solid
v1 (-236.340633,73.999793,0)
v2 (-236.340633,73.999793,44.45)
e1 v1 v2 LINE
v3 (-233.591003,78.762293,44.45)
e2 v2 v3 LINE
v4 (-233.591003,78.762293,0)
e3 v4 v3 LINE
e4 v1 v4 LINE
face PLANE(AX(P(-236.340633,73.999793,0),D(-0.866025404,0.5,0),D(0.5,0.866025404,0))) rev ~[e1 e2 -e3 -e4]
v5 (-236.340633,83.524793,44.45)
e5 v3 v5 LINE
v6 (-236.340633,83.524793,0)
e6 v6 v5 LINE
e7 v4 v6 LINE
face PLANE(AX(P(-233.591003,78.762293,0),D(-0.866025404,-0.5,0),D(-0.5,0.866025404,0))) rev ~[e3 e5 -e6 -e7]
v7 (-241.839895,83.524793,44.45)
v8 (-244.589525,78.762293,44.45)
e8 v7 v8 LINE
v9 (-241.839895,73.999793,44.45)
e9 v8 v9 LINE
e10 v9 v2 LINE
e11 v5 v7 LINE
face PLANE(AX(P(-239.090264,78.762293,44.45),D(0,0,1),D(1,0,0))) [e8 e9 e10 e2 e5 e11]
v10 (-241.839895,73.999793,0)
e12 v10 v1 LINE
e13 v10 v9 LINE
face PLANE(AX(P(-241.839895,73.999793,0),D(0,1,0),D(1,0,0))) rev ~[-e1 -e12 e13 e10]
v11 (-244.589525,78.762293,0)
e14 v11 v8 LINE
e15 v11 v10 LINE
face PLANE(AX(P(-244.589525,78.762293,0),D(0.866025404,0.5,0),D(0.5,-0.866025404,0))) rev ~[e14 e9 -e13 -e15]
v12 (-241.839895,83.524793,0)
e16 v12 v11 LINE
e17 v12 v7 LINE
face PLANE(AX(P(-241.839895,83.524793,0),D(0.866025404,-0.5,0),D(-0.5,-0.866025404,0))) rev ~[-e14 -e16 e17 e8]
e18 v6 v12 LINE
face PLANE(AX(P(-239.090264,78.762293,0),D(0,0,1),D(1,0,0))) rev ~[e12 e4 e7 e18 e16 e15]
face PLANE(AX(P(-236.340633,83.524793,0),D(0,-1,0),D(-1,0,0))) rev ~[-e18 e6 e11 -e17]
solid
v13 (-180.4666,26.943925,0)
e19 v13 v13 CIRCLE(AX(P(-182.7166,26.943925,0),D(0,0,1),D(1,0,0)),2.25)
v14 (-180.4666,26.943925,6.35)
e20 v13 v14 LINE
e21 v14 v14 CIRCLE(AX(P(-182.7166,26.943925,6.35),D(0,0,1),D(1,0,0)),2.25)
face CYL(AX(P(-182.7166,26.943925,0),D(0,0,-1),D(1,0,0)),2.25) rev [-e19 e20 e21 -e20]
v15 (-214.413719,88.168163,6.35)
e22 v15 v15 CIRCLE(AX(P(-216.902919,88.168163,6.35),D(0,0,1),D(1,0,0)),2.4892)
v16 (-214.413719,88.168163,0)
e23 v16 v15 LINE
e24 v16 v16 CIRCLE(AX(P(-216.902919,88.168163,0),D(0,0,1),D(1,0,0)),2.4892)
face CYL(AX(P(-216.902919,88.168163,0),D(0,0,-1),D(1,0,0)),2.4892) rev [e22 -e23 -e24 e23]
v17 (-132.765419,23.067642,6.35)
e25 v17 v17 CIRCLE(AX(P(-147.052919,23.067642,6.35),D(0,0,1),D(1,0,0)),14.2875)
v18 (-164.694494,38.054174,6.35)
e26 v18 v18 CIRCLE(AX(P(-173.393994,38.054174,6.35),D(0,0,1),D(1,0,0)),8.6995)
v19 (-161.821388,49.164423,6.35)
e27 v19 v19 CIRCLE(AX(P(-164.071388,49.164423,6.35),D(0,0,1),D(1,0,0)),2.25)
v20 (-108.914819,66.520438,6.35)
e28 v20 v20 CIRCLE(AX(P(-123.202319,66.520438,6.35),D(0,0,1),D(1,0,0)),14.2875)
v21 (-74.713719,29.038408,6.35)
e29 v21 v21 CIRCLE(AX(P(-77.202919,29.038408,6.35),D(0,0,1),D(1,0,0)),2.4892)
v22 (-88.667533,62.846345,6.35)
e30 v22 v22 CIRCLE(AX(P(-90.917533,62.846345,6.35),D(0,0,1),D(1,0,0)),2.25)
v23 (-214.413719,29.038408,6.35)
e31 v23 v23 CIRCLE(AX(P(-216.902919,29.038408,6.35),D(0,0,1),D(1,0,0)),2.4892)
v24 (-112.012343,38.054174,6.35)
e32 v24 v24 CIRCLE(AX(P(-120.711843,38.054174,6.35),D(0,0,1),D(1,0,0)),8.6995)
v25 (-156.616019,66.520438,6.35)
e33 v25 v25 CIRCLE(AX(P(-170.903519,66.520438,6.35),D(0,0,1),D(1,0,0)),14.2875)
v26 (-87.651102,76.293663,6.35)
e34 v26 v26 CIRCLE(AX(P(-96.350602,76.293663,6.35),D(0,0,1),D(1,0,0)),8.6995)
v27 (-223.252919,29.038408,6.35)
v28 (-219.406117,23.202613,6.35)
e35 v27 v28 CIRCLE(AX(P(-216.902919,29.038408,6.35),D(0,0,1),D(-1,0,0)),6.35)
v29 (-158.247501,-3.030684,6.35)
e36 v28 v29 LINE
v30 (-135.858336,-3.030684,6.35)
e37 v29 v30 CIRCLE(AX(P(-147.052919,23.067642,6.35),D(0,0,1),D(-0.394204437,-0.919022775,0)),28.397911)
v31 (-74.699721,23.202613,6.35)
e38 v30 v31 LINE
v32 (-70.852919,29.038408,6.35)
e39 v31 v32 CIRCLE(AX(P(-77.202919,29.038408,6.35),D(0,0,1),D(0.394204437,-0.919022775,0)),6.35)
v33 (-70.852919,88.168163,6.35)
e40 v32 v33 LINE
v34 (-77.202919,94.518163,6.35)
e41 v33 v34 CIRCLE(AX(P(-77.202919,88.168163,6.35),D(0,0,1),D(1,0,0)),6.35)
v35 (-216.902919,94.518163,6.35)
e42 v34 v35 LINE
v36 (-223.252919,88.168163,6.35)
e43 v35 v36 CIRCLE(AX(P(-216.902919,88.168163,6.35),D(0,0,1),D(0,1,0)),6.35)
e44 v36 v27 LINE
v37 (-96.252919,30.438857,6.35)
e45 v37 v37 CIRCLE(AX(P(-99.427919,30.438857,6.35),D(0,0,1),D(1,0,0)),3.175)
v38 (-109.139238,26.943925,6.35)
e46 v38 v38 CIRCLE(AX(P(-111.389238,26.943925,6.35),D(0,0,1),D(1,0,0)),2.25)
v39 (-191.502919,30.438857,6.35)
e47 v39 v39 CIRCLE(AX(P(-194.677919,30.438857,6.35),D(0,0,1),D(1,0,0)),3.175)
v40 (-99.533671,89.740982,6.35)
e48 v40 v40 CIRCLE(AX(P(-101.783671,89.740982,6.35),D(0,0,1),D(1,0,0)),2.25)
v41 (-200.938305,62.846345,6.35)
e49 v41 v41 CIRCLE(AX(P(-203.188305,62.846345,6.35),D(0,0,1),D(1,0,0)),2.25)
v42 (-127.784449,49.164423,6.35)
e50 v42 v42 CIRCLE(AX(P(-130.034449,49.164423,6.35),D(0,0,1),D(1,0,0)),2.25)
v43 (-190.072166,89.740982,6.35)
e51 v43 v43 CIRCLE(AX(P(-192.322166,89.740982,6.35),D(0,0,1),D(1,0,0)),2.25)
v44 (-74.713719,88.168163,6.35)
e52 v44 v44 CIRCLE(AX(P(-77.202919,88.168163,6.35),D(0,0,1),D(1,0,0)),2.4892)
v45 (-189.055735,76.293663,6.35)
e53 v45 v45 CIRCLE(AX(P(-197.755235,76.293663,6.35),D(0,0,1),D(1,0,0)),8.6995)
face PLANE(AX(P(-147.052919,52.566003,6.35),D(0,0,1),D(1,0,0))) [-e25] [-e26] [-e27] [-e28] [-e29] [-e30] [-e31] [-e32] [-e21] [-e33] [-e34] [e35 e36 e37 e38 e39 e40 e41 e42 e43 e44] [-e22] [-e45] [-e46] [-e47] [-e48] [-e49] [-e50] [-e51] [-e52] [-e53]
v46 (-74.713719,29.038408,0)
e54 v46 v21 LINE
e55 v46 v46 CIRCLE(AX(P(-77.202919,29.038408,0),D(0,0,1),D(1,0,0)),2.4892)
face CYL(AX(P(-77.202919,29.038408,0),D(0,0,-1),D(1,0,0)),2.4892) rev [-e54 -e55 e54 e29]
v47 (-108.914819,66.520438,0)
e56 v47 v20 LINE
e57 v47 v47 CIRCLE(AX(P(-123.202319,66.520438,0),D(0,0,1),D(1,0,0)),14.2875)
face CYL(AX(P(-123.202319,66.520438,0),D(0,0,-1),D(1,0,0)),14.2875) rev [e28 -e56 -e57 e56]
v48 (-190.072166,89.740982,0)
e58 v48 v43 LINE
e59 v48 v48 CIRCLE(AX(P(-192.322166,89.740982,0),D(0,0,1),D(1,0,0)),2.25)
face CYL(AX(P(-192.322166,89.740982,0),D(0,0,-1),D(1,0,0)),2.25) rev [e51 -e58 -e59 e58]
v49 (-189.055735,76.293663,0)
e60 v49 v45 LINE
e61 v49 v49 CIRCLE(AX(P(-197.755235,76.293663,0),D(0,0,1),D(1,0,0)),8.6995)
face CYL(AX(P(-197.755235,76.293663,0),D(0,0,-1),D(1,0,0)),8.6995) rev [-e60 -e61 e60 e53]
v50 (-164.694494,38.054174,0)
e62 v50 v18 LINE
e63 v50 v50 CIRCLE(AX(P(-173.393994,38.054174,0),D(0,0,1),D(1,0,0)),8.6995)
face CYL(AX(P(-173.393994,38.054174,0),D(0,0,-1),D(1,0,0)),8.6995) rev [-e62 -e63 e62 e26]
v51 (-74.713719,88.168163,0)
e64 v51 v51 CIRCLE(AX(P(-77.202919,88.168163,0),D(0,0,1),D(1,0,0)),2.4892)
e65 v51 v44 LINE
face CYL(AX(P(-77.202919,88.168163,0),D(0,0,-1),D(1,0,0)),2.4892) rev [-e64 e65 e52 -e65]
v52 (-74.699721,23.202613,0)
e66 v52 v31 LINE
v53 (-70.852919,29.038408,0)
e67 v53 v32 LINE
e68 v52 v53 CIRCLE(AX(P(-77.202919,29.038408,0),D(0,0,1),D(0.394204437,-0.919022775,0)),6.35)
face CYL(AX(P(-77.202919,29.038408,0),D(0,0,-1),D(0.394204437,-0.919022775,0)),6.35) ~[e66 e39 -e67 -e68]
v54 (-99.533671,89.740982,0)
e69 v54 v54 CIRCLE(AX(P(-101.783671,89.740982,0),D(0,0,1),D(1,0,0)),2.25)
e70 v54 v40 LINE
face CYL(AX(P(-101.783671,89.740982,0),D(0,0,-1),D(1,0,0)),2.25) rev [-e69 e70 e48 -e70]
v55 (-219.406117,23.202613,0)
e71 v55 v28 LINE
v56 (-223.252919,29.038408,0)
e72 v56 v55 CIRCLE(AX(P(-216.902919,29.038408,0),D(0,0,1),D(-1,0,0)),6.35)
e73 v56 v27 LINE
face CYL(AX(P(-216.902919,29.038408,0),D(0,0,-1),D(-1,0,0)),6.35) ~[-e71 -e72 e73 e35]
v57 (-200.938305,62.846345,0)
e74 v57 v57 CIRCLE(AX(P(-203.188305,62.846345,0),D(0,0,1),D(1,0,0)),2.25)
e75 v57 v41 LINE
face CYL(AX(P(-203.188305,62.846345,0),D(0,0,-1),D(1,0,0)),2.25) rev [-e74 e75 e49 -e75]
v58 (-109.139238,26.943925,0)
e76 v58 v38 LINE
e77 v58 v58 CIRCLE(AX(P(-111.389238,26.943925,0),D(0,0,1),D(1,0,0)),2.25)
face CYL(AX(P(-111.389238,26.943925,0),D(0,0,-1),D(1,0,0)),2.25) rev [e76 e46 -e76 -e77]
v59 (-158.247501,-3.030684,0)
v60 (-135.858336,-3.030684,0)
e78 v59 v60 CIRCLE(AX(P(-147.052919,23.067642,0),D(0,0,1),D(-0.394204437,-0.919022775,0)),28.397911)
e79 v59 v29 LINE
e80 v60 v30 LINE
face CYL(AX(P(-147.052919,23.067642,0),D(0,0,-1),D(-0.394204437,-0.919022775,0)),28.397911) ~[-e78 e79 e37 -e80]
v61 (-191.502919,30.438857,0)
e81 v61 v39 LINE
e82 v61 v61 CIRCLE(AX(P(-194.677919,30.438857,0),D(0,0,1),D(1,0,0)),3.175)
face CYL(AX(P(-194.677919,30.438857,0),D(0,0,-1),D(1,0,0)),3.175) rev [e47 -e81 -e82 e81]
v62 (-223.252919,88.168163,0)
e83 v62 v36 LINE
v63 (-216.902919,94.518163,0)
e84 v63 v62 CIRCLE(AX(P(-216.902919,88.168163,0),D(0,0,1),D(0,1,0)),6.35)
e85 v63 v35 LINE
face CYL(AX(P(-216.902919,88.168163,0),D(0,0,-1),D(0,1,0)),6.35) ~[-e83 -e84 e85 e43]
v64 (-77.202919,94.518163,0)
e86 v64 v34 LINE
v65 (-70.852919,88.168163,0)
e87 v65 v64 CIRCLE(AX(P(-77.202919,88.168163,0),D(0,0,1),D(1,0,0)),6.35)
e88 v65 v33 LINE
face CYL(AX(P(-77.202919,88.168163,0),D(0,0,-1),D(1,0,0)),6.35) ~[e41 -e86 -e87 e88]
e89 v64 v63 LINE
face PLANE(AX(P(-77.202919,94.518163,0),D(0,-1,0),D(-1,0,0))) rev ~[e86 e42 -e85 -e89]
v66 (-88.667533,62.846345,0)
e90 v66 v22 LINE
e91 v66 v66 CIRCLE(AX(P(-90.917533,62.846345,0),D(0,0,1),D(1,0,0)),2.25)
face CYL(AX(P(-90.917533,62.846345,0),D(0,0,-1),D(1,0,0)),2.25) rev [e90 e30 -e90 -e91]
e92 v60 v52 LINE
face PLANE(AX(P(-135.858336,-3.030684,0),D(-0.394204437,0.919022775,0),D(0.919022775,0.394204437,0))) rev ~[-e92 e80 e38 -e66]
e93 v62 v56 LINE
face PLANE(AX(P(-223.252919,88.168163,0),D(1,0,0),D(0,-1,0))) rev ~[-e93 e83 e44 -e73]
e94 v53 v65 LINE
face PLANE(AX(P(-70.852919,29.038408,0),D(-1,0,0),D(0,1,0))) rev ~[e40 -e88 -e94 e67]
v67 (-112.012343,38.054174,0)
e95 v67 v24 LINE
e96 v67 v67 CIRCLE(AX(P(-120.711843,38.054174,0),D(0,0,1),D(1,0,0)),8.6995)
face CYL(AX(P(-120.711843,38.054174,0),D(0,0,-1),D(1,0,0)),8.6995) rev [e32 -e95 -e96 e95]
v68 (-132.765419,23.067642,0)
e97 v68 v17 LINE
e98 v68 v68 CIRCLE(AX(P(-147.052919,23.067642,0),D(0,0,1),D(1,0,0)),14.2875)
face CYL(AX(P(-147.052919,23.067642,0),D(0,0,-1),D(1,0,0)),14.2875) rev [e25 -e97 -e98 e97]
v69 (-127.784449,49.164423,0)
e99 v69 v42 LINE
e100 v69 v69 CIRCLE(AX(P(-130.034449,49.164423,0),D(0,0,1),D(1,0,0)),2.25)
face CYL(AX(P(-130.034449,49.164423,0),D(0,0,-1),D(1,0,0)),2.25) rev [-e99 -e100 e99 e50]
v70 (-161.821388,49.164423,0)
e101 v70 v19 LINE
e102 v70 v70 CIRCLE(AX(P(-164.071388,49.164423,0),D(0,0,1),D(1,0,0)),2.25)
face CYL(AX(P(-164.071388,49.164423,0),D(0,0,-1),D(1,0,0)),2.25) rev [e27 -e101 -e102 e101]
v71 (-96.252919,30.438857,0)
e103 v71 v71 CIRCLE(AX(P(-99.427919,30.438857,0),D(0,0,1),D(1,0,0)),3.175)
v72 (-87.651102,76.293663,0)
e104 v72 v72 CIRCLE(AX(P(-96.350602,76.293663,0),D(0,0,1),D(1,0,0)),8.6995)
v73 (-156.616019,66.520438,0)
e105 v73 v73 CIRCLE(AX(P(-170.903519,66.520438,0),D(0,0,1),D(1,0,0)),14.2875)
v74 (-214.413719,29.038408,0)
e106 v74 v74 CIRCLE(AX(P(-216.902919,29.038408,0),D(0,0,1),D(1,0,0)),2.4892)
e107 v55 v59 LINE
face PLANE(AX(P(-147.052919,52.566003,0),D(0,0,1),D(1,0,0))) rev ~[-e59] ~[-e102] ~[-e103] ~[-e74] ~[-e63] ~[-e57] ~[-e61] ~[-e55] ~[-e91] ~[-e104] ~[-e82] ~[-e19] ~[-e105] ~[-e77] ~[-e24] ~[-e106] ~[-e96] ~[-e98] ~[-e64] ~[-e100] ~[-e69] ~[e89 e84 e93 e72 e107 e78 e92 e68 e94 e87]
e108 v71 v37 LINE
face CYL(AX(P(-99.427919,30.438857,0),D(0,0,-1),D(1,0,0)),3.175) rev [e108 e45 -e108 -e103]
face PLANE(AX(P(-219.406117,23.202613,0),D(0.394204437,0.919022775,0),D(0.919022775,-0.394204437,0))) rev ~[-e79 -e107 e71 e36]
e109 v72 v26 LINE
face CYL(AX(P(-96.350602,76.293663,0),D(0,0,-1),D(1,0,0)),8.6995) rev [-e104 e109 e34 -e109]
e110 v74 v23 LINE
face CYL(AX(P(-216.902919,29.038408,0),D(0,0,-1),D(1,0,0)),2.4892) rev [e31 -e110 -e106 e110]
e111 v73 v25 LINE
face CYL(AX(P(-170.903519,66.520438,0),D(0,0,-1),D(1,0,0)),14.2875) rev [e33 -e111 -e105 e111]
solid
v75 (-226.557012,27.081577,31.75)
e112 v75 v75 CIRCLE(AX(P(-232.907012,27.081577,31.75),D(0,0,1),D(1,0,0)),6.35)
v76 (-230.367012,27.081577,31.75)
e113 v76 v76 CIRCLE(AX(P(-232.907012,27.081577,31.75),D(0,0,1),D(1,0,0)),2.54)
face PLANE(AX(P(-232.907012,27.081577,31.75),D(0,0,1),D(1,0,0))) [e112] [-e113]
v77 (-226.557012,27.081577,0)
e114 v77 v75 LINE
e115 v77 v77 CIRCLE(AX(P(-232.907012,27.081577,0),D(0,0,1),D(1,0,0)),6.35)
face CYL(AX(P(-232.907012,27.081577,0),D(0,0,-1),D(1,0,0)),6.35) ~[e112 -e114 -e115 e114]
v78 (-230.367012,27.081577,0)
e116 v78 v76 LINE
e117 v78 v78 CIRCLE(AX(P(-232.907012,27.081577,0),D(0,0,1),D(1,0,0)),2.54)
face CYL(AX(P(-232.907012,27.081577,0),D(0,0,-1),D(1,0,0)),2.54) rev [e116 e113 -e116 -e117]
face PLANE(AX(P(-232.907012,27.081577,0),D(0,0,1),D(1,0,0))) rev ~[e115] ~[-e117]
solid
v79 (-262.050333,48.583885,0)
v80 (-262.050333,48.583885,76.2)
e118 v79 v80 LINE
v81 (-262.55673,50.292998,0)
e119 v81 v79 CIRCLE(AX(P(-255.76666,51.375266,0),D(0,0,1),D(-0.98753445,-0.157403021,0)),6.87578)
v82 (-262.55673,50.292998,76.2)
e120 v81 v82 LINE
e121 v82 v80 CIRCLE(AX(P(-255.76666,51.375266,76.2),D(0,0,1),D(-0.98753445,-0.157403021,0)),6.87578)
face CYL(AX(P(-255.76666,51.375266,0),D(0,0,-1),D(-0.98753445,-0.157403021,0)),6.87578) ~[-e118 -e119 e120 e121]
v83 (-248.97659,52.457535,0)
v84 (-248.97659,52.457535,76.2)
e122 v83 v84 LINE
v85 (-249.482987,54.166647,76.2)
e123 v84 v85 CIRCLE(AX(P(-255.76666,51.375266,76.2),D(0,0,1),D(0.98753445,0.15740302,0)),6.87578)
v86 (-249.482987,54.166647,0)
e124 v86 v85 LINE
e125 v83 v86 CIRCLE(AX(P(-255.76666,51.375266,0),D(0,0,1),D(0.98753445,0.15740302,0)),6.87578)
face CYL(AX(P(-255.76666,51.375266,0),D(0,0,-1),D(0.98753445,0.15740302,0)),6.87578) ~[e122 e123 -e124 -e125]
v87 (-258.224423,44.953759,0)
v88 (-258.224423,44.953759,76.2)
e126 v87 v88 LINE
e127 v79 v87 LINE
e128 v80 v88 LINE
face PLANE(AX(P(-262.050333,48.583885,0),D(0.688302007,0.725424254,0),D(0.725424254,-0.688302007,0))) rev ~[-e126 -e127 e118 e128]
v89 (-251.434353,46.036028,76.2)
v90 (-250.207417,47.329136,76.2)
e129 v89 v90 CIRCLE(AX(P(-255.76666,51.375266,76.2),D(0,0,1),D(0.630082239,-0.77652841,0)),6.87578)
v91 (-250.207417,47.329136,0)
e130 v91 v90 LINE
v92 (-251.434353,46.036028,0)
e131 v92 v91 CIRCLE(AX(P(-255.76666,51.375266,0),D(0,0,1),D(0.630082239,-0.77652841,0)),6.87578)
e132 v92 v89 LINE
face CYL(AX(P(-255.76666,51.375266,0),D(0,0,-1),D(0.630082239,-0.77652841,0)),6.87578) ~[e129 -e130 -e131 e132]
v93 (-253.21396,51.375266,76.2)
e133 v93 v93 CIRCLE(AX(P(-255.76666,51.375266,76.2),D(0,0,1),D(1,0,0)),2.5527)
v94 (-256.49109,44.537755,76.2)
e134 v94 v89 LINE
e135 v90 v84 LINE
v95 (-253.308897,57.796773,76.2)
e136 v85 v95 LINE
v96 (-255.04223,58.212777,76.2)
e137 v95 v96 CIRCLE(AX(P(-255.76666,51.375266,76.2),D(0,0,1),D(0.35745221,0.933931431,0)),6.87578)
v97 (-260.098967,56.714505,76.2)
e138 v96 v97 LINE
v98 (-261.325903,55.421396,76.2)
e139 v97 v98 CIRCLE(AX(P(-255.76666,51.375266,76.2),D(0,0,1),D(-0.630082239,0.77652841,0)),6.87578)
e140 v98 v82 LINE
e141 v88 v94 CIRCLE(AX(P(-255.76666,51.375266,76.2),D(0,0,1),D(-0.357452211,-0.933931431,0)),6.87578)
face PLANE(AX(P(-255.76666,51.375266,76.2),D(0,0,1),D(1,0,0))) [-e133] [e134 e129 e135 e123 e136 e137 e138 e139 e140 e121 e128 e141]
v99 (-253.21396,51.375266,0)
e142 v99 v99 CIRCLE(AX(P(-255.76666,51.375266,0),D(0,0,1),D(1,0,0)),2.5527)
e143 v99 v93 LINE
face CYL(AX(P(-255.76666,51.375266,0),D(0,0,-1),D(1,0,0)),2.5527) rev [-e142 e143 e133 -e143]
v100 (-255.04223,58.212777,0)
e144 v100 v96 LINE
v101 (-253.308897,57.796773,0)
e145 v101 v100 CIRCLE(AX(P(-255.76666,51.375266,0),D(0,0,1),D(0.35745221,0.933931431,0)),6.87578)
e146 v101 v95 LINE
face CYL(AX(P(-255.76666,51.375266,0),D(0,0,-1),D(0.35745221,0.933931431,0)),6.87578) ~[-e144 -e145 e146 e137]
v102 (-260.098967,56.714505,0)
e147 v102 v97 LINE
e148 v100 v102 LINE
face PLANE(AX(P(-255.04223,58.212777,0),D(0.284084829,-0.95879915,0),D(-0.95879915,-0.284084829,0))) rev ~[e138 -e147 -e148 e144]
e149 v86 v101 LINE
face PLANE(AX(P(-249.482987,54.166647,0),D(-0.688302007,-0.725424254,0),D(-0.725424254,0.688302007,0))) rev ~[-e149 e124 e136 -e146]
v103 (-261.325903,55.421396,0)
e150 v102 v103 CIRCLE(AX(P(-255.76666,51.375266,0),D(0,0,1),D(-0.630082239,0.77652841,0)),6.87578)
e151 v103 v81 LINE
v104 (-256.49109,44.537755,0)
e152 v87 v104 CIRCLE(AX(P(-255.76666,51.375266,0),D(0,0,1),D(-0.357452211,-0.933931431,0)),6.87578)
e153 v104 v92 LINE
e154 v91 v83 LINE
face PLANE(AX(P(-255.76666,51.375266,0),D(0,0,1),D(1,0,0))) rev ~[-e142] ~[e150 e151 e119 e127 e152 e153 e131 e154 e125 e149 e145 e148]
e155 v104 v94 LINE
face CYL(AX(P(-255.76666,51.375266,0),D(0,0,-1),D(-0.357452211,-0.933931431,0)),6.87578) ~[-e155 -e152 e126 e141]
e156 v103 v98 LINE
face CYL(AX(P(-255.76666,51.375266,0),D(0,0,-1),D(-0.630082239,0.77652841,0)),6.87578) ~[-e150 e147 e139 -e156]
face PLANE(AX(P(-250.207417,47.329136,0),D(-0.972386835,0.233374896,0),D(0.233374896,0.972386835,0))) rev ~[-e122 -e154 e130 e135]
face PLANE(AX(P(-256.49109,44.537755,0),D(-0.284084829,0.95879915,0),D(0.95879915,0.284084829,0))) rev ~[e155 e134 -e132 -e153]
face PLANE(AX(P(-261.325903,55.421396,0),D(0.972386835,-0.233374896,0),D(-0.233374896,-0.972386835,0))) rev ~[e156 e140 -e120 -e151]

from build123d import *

# Parameters (mm, degrees)
F0_R     = 2.4892
F0_R_2   = 3.175
F0_R_3   = 2.25
F0_R_4   = 8.6995
F0_R_5   = 14.2875
F1_DEPTH = 6.35
F3_R     = 6.35
F3_R_2   = 2.54
F4_DEPTH = 31.75
F6_DEPTH = 44.45
F7_R     = 2.5527
F8_DEPTH = 76.2


# Not quite as in the source:
# - a length typed as a fraction of an inch, garbled in the dataset ("3 / 203.2 mm" for 3/8 in), is restored


with BuildPart() as f1:
    # F0 (on Top) → F1 (new body)
    with BuildSketch(Plane.XY):
        with BuildLine():
            Line((-77.202918796, 94.5181631938), (-216.902918796, 94.5181631938))
            ThreePointArc((-216.902918796, 94.5181631938), (-221.3930468565, 92.6582912543), (-223.252918796, 88.1681631938))
            Line((-223.252918796, 88.1681631938), (-223.252918796, 29.0384075017))
            ThreePointArc((-223.252918796, 29.0384075017), (-222.2047019124, 25.5436119732), (-219.4061169736, 23.2026128786))
            Line((-219.4061169736, 23.2026128786), (-158.2475012348, -3.0306844448))
            ThreePointArc((-158.2475012348, -3.0306844448), (-147.052918796, -5.3302684462), (-135.8583363571, -3.0306844448))
            Line((-135.8583363571, -3.0306844448), (-74.6997206183, 23.2026128786))
            ThreePointArc((-74.6997206183, 23.2026128786), (-71.9011356795, 25.5436119732), (-70.852918796, 29.0384075017))
            Line((-70.852918796, 29.0384075017), (-70.852918796, 88.1681631938))
            ThreePointArc((-70.852918796, 88.1681631938), (-72.7127907354, 92.6582912543), (-77.202918796, 94.5181631938))
        make_face()
        with Locations((-216.902918796, 29.0384075017)):
            Circle(F0_R, mode=Mode.SUBTRACT)
        with Locations((-194.677918796, 30.4388571531)):
            Circle(F0_R_2, mode=Mode.SUBTRACT)
        with Locations((-182.7165999633, 26.9439251239)):
            Circle(F0_R_3, mode=Mode.SUBTRACT)
        with Locations((-173.393994145, 38.0541741003)):
            Circle(F0_R_4, mode=Mode.SUBTRACT)
        with Locations((-147.052918796, 23.0676423228)):
            Circle(F0_R_5, mode=Mode.SUBTRACT)
        with Locations((-111.3892376286, 26.9439251239)):
            Circle(F0_R_3, mode=Mode.SUBTRACT)
        with Locations((-120.711843447, 38.0541741003)):
            Circle(F0_R_4, mode=Mode.SUBTRACT)
        with Locations((-99.427918796, 30.4388571531)):
            Circle(F0_R_2, mode=Mode.SUBTRACT)
        with Locations((-77.202918796, 29.0384075017)):
            Circle(F0_R, mode=Mode.SUBTRACT)
        with Locations((-203.1883047019, 62.8463448774)):
            Circle(F0_R_3, mode=Mode.SUBTRACT)
        with Locations((-164.0713883267, 49.1644230766)):
            Circle(F0_R_3, mode=Mode.SUBTRACT)
        with Locations((-170.903518796, 66.5204375982)):
            Circle(F0_R_5, mode=Mode.SUBTRACT)
        with Locations((-197.7552354349, 76.2936631938)):
            Circle(F0_R_4, mode=Mode.SUBTRACT)
        with Locations((-216.902918796, 88.1681631938)):
            Circle(F0_R, mode=Mode.SUBTRACT)
        with Locations((-192.322166168, 89.7409815101)):
            Circle(F0_R_3, mode=Mode.SUBTRACT)
        with Locations((-130.0344492653, 49.1644230766)):
            Circle(F0_R_3, mode=Mode.SUBTRACT)
        with Locations((-123.202318796, 66.5204375982)):
            Circle(F0_R_5, mode=Mode.SUBTRACT)
        with Locations((-90.9175328901, 62.8463448774)):
            Circle(F0_R_3, mode=Mode.SUBTRACT)
        with Locations((-96.350602157, 76.2936631938)):
            Circle(F0_R_4, mode=Mode.SUBTRACT)
        with Locations((-101.783671424, 89.7409815101)):
            Circle(F0_R_3, mode=Mode.SUBTRACT)
        with Locations((-77.202918796, 88.1681631938)):
            Circle(F0_R, mode=Mode.SUBTRACT)
    extrude(amount=F1_DEPTH)


with BuildPart() as f4:
    # F3 (on Top) → F4 (new body)
    with BuildSketch(Plane.XY):
        with Locations((-232.907012105, 27.0815771073)):
            Circle(F3_R)
        with Locations((-232.907012105, 27.0815771073)):
            Circle(F3_R_2, mode=Mode.SUBTRACT)
    extrude(amount=F4_DEPTH)


with BuildPart() as f6:
    # F5 (on Top) → F6 (new body)
    with BuildSketch(Plane.XY):
        Polygon((-241.8398945006, 73.9997928619), (-236.3406331865, 73.9997928619), (-233.5910025295, 78.7622928619), (-236.3406331865, 83.5247928619), (-241.8398945006, 83.5247928619), (-244.5895251576, 78.7622928619), align=None)
    extrude(amount=F6_DEPTH)


with BuildPart() as f8:
    # F7 (on Top) → F8 (new body)
    with BuildSketch(Plane.XY):
        with BuildLine():
            Line((-256.4910895061, 44.5377554726), (-251.4343531168, 46.0360276519))
            ThreePointArc((-251.4343531168, 46.0360276519), (-250.7788024003, 46.642652994), (-250.2074167827, 47.3291364414))
            Line((-250.2074167827, 47.3291364414), (-248.9765903572, 52.4575347044))
            ThreePointArc((-248.9765903572, 52.4575347044), (-249.1741679557, 53.3285709495), (-249.4829872516, 54.1666471334))
            Line((-249.4829872516, 54.1666471334), (-253.3088972154, 57.7967732171))
            ThreePointArc((-253.3088972154, 57.7967732171), (-254.1620255305, 58.06118412), (-255.042230444, 58.2127768565))
            Line((-255.042230444, 58.2127768565), (-260.0989668333, 56.7145046772))
            ThreePointArc((-260.0989668333, 56.7145046772), (-260.7545175498, 56.1078793351), (-261.3259031675, 55.4213958876))
            Line((-261.3259031675, 55.4213958876), (-262.556729593, 50.2929976246))
            ThreePointArc((-262.556729593, 50.2929976246), (-262.3591519944, 49.4219613796), (-262.0503326985, 48.5838851957))
            Line((-262.0503326985, 48.5838851957), (-258.2244227347, 44.953759112))
            ThreePointArc((-258.2244227347, 44.953759112), (-257.3712944196, 44.689348209), (-256.4910895061, 44.5377554726))
        make_face()
        with Locations((-255.7666599751, 51.3752661645)):
            Circle(F7_R, mode=Mode.SUBTRACT)
    extrude(amount=F8_DEPTH)


solid = Compound([f1.part, f4.part, f6.part, f8.part])
